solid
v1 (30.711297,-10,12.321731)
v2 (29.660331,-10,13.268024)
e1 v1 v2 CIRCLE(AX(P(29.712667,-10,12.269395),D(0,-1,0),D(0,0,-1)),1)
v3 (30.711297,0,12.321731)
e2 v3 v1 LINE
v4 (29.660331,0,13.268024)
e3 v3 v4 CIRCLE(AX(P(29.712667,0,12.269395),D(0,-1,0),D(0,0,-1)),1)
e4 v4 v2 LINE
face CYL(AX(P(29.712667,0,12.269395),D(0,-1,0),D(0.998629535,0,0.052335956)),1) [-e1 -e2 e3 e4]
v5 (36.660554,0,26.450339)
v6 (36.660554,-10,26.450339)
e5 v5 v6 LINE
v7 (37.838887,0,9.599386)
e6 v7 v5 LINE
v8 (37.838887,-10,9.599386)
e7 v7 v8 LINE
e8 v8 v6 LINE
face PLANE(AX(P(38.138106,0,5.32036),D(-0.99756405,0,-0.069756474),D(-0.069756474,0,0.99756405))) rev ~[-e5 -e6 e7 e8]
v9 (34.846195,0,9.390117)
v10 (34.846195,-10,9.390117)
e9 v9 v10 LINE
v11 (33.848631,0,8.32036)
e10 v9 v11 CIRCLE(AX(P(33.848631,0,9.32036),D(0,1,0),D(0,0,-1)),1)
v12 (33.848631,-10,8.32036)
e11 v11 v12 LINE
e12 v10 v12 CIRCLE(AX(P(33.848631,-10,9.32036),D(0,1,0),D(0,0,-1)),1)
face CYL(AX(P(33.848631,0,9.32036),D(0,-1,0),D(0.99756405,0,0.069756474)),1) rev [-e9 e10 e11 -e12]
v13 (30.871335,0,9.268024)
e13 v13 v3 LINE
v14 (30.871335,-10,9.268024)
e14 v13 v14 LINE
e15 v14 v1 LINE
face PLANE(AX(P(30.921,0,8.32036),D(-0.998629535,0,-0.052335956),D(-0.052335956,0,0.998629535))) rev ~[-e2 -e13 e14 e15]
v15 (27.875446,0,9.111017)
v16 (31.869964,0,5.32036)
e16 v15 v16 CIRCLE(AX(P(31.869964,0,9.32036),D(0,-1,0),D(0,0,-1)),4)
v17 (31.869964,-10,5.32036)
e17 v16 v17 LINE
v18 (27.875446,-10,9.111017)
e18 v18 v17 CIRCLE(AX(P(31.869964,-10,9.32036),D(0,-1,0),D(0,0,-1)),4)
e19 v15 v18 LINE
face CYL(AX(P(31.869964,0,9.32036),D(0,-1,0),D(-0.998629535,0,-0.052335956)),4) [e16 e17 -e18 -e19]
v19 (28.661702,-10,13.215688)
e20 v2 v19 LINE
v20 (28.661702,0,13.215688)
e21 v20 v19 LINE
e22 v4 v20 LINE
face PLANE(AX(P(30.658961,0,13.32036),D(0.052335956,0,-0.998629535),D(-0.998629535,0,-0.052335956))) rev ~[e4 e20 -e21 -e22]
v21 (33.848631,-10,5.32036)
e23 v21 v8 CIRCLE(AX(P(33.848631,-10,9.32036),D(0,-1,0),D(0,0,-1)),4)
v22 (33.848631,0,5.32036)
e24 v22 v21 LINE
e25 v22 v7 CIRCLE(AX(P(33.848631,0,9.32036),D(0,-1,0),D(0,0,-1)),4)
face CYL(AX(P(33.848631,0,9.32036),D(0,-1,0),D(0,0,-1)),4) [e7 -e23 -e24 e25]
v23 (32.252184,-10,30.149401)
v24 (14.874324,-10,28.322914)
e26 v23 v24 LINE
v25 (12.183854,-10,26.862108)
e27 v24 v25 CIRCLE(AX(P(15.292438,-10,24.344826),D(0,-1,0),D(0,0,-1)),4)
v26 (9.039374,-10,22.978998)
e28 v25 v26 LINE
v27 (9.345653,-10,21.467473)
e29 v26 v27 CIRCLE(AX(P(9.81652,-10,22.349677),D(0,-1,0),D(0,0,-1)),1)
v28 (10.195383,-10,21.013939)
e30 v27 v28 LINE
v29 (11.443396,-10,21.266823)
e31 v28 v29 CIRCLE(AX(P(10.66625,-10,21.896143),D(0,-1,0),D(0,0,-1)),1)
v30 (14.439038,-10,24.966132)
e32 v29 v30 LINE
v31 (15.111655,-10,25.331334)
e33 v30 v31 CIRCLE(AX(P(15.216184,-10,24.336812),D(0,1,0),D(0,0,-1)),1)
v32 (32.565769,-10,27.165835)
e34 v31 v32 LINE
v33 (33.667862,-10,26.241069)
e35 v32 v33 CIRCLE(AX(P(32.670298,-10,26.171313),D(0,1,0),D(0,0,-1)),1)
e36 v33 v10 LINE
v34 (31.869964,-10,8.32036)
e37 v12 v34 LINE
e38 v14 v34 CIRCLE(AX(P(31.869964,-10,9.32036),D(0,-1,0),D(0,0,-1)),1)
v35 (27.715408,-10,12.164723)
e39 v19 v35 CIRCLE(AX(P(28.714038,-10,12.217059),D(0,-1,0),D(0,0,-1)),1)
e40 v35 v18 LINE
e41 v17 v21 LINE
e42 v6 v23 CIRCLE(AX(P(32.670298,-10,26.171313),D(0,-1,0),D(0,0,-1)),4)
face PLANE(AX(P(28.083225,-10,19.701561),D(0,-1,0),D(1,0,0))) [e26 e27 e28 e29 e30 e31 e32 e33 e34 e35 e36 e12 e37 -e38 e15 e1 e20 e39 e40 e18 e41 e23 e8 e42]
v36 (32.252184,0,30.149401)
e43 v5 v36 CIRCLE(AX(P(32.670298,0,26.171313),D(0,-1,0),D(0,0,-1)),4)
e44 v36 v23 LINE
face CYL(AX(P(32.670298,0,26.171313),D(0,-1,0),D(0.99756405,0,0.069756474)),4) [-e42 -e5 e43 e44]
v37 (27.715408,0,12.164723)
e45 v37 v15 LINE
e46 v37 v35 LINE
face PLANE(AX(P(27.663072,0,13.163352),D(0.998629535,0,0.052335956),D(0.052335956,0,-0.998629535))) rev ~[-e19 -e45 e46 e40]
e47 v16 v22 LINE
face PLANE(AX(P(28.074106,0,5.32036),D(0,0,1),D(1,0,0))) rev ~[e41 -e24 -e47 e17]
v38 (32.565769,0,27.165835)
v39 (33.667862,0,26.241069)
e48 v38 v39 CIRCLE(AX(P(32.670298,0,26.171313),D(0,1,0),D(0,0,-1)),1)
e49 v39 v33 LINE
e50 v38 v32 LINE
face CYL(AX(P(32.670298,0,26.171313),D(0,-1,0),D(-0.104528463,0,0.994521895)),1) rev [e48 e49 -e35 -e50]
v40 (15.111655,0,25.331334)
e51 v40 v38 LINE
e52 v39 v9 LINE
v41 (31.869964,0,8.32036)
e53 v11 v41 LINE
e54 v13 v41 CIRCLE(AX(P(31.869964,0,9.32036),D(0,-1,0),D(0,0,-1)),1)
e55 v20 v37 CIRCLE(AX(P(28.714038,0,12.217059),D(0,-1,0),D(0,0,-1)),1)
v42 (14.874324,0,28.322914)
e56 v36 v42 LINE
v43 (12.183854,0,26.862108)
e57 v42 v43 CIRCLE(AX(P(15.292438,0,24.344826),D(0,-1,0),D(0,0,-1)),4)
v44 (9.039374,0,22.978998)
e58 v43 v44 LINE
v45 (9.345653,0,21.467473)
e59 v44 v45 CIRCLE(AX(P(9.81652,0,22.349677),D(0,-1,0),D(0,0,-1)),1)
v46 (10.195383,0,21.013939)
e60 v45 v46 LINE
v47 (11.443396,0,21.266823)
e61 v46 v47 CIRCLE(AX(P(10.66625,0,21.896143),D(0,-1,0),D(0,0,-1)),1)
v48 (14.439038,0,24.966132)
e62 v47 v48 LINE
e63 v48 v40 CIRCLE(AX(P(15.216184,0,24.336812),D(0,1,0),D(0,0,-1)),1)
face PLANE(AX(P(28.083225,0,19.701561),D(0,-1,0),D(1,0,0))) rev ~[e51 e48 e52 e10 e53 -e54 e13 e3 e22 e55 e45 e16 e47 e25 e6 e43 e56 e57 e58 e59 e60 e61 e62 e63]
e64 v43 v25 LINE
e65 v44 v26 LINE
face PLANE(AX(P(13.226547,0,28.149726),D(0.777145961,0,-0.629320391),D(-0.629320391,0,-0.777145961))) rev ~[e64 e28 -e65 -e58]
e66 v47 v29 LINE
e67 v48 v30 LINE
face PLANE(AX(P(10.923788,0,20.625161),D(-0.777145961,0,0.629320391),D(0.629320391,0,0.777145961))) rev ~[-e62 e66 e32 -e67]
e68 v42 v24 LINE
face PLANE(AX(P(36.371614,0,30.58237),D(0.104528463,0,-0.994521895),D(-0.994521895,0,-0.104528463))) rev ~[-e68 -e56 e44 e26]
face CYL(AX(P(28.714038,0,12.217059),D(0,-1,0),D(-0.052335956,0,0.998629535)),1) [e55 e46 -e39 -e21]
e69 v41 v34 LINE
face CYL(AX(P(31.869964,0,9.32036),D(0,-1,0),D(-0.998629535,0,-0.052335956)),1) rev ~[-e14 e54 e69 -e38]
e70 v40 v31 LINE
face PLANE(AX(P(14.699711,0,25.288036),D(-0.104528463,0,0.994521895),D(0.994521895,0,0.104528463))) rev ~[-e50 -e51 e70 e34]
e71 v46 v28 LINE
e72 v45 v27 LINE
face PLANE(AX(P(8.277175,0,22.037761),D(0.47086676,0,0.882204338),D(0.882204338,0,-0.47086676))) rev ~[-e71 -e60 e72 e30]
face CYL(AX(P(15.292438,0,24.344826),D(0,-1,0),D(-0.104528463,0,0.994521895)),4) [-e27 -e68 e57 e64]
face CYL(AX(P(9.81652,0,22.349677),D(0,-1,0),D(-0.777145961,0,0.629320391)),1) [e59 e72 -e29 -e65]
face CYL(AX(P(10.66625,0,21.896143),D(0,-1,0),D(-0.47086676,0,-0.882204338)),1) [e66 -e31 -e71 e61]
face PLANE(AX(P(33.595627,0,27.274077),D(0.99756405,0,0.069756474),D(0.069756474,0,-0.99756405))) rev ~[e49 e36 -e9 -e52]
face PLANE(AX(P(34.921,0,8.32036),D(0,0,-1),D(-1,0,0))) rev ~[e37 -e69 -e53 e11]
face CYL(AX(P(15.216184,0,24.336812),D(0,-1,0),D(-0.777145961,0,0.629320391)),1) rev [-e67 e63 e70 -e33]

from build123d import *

# Parameters (mm, degrees)
F1_DEPTH = 10
F2_R     = 1
F3_R     = 4


# Not quite as in the source:
# - two fillets or chamfers of one size are made in one step
# - a feature names something its author has since deleted; it is built from what else it names


with BuildPart() as f1:
    # F0 (on Front) → F1 (new body)
    with BuildSketch(Plane.XZ):
        Polygon((30.9209997221, 8.3203603271), (30.6589608257, 13.3203603271), (27.6630722214, 13.1633524584), (28.0741060219, 5.3203603271), (38.1381058522, 5.3203603271), (36.3716140423, 30.5823701452), (13.2265466485, 28.1497255366), (8.2771753479, 22.0377609909), (10.9237883626, 20.6251607112), (14.6997107089, 25.28803648), (33.5956267209, 27.274077282), (34.9209997221, 8.3203603271), align=None)
    extrude(amount=F1_DEPTH)

    # F2
    f2_edges = [f1.edges().sort_by_distance(p)[0] for p in [
        (34.921, -5, 8.32036),
        (30.921, -5, 8.32036),
        (14.699711, -5, 25.288036),
        (8.277175, -5, 22.037761),
        (10.923788, -5, 20.625161),
        (33.595627, -5, 27.274077),
        (30.658961, -5, 13.32036),
        (27.663072, -5, 13.163352),
    ]]
    fillet(f2_edges, radius=F2_R)

    # F3
    f3_edges = [f1.edges().sort_by_distance(p)[0] for p in [
        (38.138106, -5, 5.32036),
        (28.074106, -5, 5.32036),
        (13.226547, -5, 28.149726),
        (36.371614, -5, 30.58237),
    ]]
    fillet(f3_edges, radius=F3_R)


solid = f1.part
